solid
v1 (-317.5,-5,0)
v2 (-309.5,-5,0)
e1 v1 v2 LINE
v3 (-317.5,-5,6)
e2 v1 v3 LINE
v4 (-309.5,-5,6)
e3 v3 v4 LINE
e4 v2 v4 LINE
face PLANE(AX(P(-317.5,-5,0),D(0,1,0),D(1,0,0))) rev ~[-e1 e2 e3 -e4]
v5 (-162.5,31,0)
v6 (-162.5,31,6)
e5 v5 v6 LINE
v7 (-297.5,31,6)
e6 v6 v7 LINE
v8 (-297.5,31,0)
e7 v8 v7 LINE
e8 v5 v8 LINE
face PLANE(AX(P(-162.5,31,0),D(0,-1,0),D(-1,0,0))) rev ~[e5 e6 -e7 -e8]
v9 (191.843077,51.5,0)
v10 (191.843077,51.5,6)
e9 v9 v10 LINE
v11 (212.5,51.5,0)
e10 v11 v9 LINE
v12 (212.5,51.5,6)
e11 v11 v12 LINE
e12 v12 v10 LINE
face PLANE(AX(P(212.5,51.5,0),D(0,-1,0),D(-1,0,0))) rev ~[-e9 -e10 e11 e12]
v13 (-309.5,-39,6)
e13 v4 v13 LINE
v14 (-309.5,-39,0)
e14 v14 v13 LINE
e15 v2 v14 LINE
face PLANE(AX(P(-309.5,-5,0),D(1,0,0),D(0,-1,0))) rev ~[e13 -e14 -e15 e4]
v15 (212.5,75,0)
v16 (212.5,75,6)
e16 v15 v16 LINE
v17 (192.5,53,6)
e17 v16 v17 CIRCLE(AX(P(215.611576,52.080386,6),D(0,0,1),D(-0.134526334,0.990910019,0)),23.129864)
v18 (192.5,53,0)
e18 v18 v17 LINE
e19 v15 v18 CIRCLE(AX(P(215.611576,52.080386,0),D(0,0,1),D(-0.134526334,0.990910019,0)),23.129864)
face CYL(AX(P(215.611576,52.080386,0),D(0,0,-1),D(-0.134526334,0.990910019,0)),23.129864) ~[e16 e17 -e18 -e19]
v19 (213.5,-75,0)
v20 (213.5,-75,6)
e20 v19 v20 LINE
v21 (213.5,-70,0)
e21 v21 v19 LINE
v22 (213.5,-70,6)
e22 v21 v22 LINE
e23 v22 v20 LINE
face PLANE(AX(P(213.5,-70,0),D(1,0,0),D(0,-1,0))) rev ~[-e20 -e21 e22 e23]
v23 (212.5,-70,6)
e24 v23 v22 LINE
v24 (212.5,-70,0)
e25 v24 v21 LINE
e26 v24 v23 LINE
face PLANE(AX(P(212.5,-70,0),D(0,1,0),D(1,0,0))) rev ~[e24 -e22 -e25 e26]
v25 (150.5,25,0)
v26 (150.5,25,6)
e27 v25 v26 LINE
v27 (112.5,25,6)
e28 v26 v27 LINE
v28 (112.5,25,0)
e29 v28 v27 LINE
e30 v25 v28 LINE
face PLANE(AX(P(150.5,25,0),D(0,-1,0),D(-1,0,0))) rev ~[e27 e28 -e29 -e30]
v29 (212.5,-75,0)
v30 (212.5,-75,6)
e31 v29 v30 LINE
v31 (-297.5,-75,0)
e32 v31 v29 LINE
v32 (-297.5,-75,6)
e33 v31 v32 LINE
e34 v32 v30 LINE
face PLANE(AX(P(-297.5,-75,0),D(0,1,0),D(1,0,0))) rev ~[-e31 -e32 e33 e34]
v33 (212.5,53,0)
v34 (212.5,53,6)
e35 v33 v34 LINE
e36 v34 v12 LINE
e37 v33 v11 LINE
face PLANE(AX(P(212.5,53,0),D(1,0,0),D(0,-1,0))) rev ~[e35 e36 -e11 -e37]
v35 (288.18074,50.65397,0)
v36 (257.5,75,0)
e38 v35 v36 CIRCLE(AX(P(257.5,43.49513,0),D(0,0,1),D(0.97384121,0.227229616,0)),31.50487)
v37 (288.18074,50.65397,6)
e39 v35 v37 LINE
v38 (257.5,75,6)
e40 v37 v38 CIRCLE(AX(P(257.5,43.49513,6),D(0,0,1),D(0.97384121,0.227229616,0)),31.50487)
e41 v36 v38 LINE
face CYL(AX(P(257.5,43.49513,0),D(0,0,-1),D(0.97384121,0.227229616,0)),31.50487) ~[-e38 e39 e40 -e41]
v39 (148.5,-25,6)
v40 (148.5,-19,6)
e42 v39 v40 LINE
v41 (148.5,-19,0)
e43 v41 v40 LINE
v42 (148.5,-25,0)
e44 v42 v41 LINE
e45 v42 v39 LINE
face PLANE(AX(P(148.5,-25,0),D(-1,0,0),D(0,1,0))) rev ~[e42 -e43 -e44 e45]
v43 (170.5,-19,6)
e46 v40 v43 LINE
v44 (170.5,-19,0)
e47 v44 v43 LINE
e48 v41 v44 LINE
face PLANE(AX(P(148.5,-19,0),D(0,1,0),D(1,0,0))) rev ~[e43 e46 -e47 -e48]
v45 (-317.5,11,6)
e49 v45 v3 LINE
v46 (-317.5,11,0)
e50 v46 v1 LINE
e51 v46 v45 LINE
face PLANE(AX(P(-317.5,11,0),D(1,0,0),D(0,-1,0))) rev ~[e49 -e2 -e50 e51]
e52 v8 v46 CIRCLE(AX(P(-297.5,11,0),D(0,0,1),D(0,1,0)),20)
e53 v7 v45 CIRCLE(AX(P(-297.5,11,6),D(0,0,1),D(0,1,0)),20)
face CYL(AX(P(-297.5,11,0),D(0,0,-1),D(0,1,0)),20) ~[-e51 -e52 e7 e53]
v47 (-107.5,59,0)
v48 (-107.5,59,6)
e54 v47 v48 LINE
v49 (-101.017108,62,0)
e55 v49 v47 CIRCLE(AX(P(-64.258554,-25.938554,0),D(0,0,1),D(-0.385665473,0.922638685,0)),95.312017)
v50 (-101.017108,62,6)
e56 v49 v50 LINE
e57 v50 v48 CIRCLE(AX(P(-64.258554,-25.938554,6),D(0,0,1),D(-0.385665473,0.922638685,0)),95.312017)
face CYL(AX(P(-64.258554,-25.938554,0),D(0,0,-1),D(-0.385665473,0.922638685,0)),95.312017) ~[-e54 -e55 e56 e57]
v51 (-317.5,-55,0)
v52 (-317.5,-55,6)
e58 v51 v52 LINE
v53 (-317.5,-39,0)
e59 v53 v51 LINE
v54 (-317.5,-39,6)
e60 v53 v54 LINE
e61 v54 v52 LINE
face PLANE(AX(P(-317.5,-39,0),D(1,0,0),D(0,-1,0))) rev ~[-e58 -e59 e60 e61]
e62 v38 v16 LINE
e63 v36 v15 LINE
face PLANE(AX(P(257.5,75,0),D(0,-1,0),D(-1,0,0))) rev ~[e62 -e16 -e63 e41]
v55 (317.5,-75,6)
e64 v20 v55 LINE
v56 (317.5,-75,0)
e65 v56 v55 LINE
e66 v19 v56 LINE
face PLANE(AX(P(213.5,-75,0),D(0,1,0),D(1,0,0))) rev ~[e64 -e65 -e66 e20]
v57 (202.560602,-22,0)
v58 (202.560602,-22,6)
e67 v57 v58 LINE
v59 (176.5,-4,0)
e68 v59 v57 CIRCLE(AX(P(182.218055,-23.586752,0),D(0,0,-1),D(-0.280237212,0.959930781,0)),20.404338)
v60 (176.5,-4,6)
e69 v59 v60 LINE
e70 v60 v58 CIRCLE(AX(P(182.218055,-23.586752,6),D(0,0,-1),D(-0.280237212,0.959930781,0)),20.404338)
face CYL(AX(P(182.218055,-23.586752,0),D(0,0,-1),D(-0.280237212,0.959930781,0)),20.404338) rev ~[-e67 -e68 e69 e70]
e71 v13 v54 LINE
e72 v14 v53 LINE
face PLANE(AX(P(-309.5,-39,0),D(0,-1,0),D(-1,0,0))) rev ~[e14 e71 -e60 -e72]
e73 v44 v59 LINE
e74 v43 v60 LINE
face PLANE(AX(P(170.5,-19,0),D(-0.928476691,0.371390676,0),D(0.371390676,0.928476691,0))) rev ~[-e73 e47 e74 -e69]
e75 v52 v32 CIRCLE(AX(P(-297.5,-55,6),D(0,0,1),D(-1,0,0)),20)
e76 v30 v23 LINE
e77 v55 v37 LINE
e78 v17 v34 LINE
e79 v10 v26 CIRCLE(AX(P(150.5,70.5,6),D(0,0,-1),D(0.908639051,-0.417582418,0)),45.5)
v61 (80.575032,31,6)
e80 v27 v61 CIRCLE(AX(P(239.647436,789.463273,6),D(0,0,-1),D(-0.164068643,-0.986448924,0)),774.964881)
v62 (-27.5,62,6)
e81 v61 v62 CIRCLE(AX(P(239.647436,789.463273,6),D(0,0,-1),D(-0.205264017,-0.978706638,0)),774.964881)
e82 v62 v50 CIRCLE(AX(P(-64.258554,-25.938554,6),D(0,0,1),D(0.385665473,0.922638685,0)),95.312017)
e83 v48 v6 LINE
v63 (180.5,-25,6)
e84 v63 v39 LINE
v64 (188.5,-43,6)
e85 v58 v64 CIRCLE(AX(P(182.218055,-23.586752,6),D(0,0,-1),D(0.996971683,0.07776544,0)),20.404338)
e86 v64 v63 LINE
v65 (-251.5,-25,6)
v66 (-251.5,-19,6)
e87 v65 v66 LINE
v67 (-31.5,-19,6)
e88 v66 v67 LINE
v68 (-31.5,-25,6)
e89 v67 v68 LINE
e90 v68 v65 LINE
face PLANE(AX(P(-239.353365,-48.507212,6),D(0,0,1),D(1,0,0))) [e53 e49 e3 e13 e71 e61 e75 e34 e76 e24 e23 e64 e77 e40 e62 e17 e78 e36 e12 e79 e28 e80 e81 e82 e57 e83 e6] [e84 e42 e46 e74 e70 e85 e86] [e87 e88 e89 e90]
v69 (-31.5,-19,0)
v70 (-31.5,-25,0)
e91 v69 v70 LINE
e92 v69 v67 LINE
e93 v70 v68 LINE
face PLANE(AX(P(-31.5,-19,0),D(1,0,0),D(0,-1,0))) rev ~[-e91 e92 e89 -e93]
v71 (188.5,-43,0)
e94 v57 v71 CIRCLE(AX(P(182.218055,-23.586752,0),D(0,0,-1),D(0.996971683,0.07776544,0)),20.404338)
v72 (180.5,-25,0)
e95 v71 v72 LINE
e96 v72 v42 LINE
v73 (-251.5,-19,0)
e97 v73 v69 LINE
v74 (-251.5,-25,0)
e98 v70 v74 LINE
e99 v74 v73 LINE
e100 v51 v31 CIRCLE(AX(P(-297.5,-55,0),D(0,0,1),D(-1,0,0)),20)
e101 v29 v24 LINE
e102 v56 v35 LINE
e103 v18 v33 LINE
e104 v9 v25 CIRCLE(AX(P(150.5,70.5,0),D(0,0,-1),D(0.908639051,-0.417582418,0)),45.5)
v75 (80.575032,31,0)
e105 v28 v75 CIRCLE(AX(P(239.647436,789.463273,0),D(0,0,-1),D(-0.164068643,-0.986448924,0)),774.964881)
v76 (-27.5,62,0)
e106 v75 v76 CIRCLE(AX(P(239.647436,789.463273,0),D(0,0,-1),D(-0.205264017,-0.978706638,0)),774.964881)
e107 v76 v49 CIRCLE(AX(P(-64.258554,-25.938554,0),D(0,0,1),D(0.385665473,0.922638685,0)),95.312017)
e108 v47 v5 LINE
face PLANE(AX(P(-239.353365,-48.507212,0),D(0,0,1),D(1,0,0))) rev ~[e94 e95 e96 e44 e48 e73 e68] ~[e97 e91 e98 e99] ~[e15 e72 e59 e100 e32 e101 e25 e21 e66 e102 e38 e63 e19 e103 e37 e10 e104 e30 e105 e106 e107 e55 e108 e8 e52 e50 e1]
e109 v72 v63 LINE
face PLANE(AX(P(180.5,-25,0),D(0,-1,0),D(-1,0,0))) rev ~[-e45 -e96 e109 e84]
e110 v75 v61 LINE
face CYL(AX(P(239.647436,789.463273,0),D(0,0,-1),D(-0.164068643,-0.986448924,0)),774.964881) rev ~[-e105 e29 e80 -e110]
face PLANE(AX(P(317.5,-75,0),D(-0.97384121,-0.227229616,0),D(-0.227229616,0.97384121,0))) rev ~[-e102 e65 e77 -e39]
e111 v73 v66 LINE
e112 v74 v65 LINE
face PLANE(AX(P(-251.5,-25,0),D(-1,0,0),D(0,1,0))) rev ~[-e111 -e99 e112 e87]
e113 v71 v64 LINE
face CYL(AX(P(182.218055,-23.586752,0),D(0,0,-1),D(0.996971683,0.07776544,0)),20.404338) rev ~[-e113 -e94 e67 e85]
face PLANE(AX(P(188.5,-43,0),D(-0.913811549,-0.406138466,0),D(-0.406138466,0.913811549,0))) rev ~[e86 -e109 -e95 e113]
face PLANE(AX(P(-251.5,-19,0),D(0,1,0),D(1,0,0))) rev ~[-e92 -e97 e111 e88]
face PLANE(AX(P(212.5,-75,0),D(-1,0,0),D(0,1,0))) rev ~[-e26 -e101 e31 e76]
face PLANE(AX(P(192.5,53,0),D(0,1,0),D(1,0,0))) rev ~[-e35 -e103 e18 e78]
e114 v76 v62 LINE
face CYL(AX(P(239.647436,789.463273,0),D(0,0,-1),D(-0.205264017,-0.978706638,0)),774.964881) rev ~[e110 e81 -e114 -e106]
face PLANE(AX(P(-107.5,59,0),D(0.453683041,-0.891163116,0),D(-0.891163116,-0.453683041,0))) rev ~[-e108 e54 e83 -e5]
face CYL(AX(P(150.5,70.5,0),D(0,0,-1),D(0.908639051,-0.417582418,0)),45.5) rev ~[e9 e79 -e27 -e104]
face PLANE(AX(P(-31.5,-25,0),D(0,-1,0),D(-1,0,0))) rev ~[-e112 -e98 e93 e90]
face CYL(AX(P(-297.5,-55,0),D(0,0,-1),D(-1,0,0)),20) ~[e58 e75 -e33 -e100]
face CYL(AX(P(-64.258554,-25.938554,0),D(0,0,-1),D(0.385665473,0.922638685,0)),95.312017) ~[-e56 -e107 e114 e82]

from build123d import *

# Parameters (mm, degrees)
F1_DEPTH = 6


with BuildPart() as f1:
    # F0 (on Top) → F1 (new body)
    with BuildSketch(Plane.XY):
        Polygon((-297.5, -55), (-297.5, -75), (-162.5, -75), (-162.5, -25), (-251.5, -25), (-251.5, -22), (-309.5, -22), (-309.5, -39), (-317.5, -39), (-317.5, -55), align=None)
        with BuildLine():
            ThreePointArc((-317.5, -55), (-311.6421356237, -69.1421356237), (-297.5, -75))
            Line((-297.5, -75), (-297.5, -55))
            Line((-297.5, -55), (-317.5, -55))
        make_face()
        with BuildLine():
            Line((-162.5, -25), (-162.5, -75))
            Line((-162.5, -75), (212.5, -75))
            Line((212.5, -75), (212.5, -70))
            Line((212.5, -70), (212.5, -22))
            Line((212.5, -22), (202.5606023011, -22))
            ThreePointArc((202.5606023011, -22), (199.1728742742, -34.9388939069), (188.5, -43))
            Line((188.5, -43), (180.5, -43))
            Line((180.5, -43), (180.5, -25))
            Line((180.5, -25), (148.5, -25))
            Line((148.5, -25), (148.5, -22))
            Line((148.5, -22), (-31.5, -22))
            Line((-31.5, -22), (-31.5, -25))
            Line((-31.5, -25), (-162.5, -25))
        make_face()
        with BuildLine():
            Line((213.5, -70), (213.5, -75))
            Line((213.5, -75), (317.5, -75))
            Line((317.5, -75), (288.1807403902, 50.6539697565))
            ThreePointArc((288.1807403902, 50.6539697565), (277.083392323, 68.1740192438), (257.5, 75))
            Line((257.5, 75), (212.5, 75))
            Line((212.5, 75), (212.5, 53))
            Line((212.5, 53), (212.5, 51.5))
            Line((212.5, 51.5), (212.5, -22))
            Line((212.5, -22), (212.5, -70))
            Line((212.5, -70), (213.5, -70))
        make_face()
        Polygon((-317.5, 11), (-317.5, -5), (-309.5, -5), (-309.5, -22), (-251.5, -22), (-251.5, -19), (-162.5, -19), (-162.5, 31), (-297.5, 31), (-297.5, 11), align=None)
        with BuildLine():
            Line((202.5606023011, -22), (212.5, -22))
            Line((212.5, -22), (212.5, 51.5))
            Line((212.5, 51.5), (191.8430768086, 51.5))
            ThreePointArc((191.8430768086, 51.5), (175.0535129869, 32.1936689306), (150.5, 25))
            Line((150.5, 25), (112.5, 25))
            Line((112.5, 25), (-107.5, 25))
            Line((-107.5, 25), (-107.5, 31))
            Line((-107.5, 31), (-162.5, 31))
            Line((-162.5, 31), (-162.5, -19))
            Line((-162.5, -19), (-31.5, -19))
            Line((-31.5, -19), (-31.5, -22))
            Line((-31.5, -22), (148.5, -22))
            Line((148.5, -22), (148.5, -19))
            Line((148.5, -19), (170.5, -19))
            Line((170.5, -19), (170.5, -4))
            Line((170.5, -4), (176.5, -4))
            ThreePointArc((176.5, -4), (193.8141294499, -6.7978252425), (202.5606023011, -22))
        make_face()
        with BuildLine():
            ThreePointArc((-297.5, 31), (-311.6421356237, 25.1421356237), (-317.5, 11))
            Line((-317.5, 11), (-297.5, 11))
            Line((-297.5, 11), (-297.5, 31))
        make_face()
        Polygon((-107.5, 59), (-162.5, 31), (-107.5, 31), align=None)
        with BuildLine():
            Line((192.5, 53), (212.5, 53))
            Line((212.5, 53), (212.5, 75))
            ThreePointArc((212.5, 75), (198.4968622639, 67.6392161237), (192.5, 53))
        make_face()
        Polygon((180.5, -43), (188.5, -43), (180.5, -25), align=None)
        Polygon((170.5, -19), (176.5, -4), (170.5, -4), align=None)
        with BuildLine():
            Line((-107.5, 59), (-107.5, 31))
            Line((-107.5, 31), (80.5750319553, 31))
            ThreePointArc((80.5750319553, 31), (25.9745832288, 44.5374524252), (-27.5, 62))
            Line((-27.5, 62), (-27.5, 59))
            Line((-27.5, 59), (-107.5, 59))
        make_face()
        with BuildLine():
            Line((80.5750319553, 31), (-107.5, 31))
            Line((-107.5, 31), (-107.5, 25))
            Line((-107.5, 25), (112.5, 25))
            ThreePointArc((112.5, 25), (96.5060750704, 27.8327083402), (80.5750319553, 31))
        make_face()
        with BuildLine():
            ThreePointArc((-101.0171084337, 62), (-104.2866693361, 60.5607557565), (-107.5, 59))
            Line((-107.5, 59), (-27.5, 59))
            Line((-27.5, 59), (-27.5, 62))
            Line((-27.5, 62), (-101.0171084337, 62))
        make_face()
        with BuildLine():
            ThreePointArc((-27.5, 62), (-64.2585542169, 69.3734629996), (-101.0171084337, 62))
            Line((-101.0171084337, 62), (-27.5, 62))
        make_face()
    extrude(amount=F1_DEPTH)


solid = f1.part
